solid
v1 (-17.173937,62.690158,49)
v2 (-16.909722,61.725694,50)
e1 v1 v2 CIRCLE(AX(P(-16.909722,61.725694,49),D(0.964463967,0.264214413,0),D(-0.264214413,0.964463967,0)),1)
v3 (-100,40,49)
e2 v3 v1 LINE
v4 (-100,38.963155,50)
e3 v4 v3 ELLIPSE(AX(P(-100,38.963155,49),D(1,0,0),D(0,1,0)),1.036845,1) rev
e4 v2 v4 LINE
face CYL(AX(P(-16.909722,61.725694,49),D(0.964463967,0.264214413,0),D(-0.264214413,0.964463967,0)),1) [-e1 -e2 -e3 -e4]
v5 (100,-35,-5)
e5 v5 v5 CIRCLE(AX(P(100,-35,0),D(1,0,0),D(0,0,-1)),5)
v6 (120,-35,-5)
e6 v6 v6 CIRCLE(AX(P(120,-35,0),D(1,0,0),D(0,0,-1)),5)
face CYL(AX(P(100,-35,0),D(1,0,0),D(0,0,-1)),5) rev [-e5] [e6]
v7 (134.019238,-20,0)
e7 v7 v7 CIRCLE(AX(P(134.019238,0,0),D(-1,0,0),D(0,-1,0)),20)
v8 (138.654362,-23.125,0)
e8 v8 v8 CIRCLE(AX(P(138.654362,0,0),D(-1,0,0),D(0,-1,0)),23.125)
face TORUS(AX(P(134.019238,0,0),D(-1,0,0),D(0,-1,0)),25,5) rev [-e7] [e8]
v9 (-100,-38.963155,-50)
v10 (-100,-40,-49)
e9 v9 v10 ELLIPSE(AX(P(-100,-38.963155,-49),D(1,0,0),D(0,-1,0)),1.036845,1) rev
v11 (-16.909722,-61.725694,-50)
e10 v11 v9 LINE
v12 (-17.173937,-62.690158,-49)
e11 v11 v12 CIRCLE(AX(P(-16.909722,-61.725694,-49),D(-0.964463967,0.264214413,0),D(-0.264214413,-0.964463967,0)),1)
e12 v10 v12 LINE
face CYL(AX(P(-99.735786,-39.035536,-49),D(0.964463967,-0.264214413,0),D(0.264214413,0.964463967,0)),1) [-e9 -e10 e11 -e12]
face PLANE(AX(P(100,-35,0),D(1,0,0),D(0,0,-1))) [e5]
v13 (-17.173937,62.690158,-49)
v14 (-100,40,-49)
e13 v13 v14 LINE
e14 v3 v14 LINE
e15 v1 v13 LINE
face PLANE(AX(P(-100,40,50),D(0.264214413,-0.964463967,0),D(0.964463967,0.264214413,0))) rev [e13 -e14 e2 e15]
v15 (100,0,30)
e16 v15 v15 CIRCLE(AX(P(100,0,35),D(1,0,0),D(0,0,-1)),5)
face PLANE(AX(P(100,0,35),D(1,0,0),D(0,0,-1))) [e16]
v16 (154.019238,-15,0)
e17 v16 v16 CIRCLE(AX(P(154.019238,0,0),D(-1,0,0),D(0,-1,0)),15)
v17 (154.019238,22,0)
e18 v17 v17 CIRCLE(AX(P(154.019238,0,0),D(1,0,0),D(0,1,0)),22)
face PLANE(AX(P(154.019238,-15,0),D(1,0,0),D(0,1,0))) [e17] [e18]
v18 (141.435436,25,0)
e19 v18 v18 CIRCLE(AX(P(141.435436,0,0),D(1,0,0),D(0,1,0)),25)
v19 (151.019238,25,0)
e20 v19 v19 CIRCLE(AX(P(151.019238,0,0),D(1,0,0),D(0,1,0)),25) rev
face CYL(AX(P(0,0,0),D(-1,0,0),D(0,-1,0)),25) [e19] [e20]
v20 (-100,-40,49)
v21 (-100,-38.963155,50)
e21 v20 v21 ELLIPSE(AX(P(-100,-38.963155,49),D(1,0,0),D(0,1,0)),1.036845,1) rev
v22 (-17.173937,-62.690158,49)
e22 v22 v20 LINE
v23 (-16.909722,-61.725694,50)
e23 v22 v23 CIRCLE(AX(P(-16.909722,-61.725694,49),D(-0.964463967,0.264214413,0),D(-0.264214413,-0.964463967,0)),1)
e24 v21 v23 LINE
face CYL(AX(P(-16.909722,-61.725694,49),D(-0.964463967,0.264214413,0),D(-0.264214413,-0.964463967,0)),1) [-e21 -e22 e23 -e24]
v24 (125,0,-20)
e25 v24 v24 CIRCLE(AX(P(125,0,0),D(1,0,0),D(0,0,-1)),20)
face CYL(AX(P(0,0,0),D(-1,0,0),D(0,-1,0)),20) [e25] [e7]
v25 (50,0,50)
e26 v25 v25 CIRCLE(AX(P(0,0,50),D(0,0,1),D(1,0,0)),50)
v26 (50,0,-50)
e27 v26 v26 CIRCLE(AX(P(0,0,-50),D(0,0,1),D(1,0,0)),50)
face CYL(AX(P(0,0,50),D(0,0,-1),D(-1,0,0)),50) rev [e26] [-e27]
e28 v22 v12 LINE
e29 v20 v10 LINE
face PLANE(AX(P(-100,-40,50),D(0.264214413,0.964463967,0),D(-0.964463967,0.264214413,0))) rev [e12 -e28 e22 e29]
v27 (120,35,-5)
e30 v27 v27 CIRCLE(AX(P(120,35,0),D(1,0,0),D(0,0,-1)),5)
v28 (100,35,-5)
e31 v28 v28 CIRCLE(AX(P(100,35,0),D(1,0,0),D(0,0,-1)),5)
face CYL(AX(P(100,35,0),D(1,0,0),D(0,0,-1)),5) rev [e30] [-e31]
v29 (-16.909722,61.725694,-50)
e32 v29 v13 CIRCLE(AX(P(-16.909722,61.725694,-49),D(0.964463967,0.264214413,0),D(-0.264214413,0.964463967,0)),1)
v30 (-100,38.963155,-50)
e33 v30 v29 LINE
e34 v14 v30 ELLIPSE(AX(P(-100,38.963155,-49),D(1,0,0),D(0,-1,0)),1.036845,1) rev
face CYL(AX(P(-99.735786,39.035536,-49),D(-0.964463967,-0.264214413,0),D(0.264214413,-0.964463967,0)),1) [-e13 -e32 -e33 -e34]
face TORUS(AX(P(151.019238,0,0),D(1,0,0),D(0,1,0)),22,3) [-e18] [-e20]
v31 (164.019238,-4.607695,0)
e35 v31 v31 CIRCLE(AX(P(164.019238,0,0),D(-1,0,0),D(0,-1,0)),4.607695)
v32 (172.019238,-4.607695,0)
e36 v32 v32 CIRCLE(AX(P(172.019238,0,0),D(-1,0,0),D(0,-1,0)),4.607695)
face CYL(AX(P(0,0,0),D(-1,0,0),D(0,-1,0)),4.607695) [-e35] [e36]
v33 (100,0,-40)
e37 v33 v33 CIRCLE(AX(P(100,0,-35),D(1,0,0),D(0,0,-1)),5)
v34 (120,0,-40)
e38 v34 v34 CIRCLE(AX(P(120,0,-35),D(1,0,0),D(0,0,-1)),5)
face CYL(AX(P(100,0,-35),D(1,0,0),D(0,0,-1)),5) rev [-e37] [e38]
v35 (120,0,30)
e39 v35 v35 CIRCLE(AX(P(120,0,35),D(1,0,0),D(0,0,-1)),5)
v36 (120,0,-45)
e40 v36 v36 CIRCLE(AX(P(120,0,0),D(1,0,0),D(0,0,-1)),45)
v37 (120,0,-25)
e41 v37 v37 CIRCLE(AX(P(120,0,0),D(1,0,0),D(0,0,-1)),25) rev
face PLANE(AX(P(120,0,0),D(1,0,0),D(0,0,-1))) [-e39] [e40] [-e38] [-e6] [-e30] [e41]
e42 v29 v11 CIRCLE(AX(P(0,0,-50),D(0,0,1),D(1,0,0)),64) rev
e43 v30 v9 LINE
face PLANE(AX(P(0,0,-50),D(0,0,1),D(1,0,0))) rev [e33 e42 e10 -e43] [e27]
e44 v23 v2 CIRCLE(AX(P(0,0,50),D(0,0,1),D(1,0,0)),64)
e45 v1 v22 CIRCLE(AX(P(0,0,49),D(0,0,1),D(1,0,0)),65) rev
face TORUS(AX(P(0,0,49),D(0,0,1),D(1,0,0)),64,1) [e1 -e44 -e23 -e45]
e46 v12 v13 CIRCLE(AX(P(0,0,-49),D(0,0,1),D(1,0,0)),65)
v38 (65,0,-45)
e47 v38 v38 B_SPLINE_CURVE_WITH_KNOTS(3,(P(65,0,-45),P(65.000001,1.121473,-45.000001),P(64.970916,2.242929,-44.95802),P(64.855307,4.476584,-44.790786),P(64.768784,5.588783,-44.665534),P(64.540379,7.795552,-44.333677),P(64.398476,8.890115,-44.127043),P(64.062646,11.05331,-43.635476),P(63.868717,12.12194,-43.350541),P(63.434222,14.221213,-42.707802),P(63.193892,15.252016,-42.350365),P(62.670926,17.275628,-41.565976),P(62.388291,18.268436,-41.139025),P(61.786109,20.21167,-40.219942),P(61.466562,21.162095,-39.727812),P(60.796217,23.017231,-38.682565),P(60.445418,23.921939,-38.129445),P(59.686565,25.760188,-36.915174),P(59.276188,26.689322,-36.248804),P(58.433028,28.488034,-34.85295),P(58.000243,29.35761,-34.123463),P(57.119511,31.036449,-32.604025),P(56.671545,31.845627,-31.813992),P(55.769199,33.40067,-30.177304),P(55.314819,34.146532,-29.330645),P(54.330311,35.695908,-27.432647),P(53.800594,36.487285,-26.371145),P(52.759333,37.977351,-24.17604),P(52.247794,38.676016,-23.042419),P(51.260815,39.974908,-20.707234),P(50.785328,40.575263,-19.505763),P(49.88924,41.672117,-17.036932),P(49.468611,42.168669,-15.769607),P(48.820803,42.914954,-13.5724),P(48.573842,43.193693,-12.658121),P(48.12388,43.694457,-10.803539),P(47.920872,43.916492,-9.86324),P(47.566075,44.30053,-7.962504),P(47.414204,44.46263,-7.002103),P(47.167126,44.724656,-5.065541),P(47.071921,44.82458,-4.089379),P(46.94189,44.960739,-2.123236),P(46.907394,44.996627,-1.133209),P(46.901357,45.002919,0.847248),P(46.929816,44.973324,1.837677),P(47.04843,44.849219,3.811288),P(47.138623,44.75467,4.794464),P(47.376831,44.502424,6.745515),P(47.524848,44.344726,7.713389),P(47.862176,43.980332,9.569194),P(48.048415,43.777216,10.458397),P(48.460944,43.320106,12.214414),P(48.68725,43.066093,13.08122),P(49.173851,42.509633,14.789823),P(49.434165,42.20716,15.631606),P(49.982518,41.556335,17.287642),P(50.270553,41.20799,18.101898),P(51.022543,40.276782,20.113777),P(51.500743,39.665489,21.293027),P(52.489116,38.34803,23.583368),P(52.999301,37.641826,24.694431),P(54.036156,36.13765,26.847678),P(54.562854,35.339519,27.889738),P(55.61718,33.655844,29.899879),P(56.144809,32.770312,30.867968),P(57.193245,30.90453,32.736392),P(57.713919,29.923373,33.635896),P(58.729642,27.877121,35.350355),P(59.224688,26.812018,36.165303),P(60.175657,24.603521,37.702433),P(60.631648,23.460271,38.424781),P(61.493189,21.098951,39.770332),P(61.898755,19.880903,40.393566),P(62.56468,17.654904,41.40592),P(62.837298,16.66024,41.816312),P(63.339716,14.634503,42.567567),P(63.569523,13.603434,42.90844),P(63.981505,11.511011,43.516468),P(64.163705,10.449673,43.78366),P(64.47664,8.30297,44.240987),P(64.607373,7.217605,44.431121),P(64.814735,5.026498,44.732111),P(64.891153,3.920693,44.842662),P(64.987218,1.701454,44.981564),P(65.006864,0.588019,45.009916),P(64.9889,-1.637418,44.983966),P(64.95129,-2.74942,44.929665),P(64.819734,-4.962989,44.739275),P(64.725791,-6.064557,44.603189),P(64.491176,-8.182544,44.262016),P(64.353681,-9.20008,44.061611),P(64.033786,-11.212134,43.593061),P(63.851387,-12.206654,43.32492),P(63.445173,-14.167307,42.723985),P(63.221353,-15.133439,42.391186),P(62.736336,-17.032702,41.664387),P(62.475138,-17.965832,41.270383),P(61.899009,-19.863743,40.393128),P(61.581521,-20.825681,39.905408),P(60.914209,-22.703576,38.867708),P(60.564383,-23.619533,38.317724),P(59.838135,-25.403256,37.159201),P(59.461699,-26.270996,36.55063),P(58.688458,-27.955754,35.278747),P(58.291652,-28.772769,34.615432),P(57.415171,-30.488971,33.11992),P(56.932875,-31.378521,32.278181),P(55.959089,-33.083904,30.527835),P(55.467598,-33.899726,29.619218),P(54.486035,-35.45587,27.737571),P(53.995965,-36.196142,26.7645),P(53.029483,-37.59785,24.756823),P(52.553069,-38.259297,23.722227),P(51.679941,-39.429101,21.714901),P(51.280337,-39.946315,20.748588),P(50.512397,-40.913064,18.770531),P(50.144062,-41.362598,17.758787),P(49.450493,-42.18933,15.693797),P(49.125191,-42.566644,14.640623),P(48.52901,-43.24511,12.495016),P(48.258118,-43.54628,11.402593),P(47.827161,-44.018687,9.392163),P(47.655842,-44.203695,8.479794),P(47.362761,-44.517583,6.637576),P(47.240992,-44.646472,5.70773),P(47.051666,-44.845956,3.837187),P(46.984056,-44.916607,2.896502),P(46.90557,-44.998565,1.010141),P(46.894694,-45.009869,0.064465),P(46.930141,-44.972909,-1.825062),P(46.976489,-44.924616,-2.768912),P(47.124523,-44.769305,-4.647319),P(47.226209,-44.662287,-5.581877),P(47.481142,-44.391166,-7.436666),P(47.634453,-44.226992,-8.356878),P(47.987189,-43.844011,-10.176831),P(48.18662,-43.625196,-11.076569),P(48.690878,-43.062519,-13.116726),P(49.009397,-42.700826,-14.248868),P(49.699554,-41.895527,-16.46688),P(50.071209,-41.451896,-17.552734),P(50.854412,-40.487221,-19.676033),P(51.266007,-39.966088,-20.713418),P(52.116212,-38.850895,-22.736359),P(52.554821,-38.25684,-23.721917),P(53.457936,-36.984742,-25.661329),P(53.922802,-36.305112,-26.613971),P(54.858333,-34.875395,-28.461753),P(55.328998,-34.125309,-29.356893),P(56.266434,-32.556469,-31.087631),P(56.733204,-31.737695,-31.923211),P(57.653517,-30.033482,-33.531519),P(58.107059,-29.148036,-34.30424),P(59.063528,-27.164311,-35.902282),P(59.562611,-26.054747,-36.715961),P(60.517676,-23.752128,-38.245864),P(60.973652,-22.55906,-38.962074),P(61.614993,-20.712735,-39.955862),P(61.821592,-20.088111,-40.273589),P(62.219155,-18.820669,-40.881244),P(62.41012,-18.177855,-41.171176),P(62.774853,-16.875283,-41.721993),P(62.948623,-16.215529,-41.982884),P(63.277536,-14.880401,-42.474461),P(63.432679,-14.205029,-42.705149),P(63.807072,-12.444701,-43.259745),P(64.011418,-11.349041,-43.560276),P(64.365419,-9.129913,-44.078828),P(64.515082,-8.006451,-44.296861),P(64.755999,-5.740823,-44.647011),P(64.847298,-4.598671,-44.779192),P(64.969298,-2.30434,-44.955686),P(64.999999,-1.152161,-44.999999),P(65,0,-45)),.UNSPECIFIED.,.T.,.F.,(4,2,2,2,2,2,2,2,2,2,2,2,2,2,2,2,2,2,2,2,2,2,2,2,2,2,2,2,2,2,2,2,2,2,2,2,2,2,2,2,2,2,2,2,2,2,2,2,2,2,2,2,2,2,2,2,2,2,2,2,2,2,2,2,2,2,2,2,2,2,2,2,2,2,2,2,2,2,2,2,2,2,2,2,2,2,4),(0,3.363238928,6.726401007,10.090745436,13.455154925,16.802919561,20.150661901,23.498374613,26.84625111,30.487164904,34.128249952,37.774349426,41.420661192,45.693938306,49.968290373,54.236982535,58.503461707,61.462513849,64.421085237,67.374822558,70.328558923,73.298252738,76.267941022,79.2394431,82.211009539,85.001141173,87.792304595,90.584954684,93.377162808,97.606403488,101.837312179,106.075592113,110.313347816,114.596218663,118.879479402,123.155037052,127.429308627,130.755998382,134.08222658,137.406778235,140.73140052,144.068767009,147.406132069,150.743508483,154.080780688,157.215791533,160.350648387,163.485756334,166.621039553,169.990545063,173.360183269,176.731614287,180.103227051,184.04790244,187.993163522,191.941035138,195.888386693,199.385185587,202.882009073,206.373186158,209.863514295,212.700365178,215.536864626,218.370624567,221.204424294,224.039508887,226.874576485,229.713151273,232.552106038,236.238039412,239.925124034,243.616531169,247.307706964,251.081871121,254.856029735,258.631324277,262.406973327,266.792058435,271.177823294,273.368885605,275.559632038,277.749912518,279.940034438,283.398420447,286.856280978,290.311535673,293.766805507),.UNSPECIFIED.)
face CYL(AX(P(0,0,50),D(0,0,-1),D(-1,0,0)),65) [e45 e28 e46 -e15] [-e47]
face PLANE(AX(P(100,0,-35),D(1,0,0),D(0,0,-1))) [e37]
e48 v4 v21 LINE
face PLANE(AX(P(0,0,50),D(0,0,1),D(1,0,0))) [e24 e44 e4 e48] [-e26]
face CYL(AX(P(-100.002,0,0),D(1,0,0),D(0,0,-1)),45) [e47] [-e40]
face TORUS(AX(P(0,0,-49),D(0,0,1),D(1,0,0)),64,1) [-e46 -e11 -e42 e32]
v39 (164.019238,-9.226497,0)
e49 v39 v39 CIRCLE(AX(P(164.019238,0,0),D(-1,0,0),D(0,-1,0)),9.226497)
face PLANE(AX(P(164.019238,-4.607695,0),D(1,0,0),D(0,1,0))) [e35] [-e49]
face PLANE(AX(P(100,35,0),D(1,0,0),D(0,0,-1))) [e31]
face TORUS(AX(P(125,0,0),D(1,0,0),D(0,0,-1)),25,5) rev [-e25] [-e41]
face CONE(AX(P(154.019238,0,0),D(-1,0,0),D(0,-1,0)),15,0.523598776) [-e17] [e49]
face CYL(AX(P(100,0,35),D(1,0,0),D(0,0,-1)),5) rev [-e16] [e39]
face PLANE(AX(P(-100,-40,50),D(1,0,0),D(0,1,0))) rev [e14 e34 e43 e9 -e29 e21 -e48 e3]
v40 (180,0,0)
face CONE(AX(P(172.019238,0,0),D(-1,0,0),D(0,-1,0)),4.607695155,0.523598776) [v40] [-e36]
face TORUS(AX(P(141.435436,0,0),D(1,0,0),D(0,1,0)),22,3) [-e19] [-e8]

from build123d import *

# Parameters (mm, degrees)
SKETCH1_R                = 50
BOSS_EXTRUDE1_DEPTH      = 50
BOSS_EXTRUDE2_REACH      = 251.325
BOSS_EXTRUDE2_END_RADIUS = 65
BOSS_EXTRUDE2_START      = 120
SKETCH2_R                = 45
SKETCH4_R                = 5
CUT_EXTRUDE1_DEPTH       = 20
FILLET1_R                = 5
FILLET2_R                = 1
FILLET3_R                = 3


with BuildPart() as part:
    # Sketch1 → Boss-Extrude1 (new, symmetric)
    with BuildSketch(Plane.XY):
        with BuildLine():
            Line((-100, -40), (-100, 40))
            Line((-100, 40), (-17.173936855, 62.690157863))
            ThreePointArc((-17.173936855, 62.690157863), (65, 0), (-17.173936855, -62.690157863))
            Line((-17.173936855, -62.690157863), (-100, -40))
        make_face()
        Circle(SKETCH1_R, mode=Mode.SUBTRACT)
    extrude(amount=BOSS_EXTRUDE1_DEPTH, both=True)

    # Boss-Extrude2: up to this cylinder (the profile starts outside it)
    boss_extrude2_end = Plane(origin=(0, 0, 0), z_dir=(0, 0, -1)) * Cylinder(BOSS_EXTRUDE2_END_RADIUS, 633.65, mode=Mode.PRIVATE)
    # Sketch2 → Boss-Extrude2 (add, up to the surface)
    with BuildSketch(Plane(origin=(0, 0, 0), x_dir=(0, 0, -1), z_dir=(1, 0, 0)).offset(BOSS_EXTRUDE2_START), mode=Mode.PRIVATE) as boss_extrude2_sk1:
        Circle(SKETCH2_R)
    boss_extrude2_tool1 = extrude(boss_extrude2_sk1.sketch, amount=-BOSS_EXTRUDE2_REACH, mode=Mode.PRIVATE) - boss_extrude2_end
    add(boss_extrude2_tool1.solids().sort_by_distance((120, 0, 0))[0])

    # Sketch3 → Revolve1 (revolve)
    with BuildSketch(Plane.XY):
        Polygon((120, 0), (180, 0), (172.019237886, -4.607695155), (164.019237886, -4.607695155), (164.019237886, -9.226497308), (154.019237886, -15), (154.019237886, -25), (139.019237886, -25), (139.019237886, -20), (120, -20), align=None)
    revolve(axis=Axis((0, 0, 0), (1, 0, 0)))

    # Sketch4 → Cut-Extrude1 (cut)
    with BuildSketch(Plane(origin=(120, 0, 0), x_dir=(0, 0, -1), z_dir=(1, 0, 0))):
        with Locations((0, 35)):
            Circle(SKETCH4_R)
        with Locations((35, 0)):
            Circle(SKETCH4_R)
        with Locations((0, -35)):
            Circle(SKETCH4_R)
        with Locations((-35, 0)):
            Circle(SKETCH4_R)
    extrude(amount=-CUT_EXTRUDE1_DEPTH, mode=Mode.SUBTRACT)

    # Fillet1
    fillet1_edges = [part.edges().sort_by_distance(p)[0] for p in [
        (120, 20, 0),
        (139.019237886, 20, 0),
    ]]
    fillet(fillet1_edges, radius=FILLET1_R - 0.0001)  # a hair under: the kernel refuses the full size

    # Fillet2
    fillet2_edges = [part.edges().sort_by_distance(p)[0] for p in [
        (-58.586968427, 51.345078932, 50),
        (-58.586968427, -51.345078932, 50),
        (-58.586968427, 51.345078932, -50),
        (65, 0, -50),
        (-58.586968427, -51.345078932, -50),
        (65, 0, 50),
    ]]
    fillet(fillet2_edges, radius=FILLET2_R)

    # Fillet3
    fillet3_edges = [part.edges().sort_by_distance(p)[0] for p in [
        (154.019237886, 25, 0),
        (139.019237886, 25, 0),
    ]]
    fillet(fillet3_edges, radius=FILLET3_R)


solid = part.part
